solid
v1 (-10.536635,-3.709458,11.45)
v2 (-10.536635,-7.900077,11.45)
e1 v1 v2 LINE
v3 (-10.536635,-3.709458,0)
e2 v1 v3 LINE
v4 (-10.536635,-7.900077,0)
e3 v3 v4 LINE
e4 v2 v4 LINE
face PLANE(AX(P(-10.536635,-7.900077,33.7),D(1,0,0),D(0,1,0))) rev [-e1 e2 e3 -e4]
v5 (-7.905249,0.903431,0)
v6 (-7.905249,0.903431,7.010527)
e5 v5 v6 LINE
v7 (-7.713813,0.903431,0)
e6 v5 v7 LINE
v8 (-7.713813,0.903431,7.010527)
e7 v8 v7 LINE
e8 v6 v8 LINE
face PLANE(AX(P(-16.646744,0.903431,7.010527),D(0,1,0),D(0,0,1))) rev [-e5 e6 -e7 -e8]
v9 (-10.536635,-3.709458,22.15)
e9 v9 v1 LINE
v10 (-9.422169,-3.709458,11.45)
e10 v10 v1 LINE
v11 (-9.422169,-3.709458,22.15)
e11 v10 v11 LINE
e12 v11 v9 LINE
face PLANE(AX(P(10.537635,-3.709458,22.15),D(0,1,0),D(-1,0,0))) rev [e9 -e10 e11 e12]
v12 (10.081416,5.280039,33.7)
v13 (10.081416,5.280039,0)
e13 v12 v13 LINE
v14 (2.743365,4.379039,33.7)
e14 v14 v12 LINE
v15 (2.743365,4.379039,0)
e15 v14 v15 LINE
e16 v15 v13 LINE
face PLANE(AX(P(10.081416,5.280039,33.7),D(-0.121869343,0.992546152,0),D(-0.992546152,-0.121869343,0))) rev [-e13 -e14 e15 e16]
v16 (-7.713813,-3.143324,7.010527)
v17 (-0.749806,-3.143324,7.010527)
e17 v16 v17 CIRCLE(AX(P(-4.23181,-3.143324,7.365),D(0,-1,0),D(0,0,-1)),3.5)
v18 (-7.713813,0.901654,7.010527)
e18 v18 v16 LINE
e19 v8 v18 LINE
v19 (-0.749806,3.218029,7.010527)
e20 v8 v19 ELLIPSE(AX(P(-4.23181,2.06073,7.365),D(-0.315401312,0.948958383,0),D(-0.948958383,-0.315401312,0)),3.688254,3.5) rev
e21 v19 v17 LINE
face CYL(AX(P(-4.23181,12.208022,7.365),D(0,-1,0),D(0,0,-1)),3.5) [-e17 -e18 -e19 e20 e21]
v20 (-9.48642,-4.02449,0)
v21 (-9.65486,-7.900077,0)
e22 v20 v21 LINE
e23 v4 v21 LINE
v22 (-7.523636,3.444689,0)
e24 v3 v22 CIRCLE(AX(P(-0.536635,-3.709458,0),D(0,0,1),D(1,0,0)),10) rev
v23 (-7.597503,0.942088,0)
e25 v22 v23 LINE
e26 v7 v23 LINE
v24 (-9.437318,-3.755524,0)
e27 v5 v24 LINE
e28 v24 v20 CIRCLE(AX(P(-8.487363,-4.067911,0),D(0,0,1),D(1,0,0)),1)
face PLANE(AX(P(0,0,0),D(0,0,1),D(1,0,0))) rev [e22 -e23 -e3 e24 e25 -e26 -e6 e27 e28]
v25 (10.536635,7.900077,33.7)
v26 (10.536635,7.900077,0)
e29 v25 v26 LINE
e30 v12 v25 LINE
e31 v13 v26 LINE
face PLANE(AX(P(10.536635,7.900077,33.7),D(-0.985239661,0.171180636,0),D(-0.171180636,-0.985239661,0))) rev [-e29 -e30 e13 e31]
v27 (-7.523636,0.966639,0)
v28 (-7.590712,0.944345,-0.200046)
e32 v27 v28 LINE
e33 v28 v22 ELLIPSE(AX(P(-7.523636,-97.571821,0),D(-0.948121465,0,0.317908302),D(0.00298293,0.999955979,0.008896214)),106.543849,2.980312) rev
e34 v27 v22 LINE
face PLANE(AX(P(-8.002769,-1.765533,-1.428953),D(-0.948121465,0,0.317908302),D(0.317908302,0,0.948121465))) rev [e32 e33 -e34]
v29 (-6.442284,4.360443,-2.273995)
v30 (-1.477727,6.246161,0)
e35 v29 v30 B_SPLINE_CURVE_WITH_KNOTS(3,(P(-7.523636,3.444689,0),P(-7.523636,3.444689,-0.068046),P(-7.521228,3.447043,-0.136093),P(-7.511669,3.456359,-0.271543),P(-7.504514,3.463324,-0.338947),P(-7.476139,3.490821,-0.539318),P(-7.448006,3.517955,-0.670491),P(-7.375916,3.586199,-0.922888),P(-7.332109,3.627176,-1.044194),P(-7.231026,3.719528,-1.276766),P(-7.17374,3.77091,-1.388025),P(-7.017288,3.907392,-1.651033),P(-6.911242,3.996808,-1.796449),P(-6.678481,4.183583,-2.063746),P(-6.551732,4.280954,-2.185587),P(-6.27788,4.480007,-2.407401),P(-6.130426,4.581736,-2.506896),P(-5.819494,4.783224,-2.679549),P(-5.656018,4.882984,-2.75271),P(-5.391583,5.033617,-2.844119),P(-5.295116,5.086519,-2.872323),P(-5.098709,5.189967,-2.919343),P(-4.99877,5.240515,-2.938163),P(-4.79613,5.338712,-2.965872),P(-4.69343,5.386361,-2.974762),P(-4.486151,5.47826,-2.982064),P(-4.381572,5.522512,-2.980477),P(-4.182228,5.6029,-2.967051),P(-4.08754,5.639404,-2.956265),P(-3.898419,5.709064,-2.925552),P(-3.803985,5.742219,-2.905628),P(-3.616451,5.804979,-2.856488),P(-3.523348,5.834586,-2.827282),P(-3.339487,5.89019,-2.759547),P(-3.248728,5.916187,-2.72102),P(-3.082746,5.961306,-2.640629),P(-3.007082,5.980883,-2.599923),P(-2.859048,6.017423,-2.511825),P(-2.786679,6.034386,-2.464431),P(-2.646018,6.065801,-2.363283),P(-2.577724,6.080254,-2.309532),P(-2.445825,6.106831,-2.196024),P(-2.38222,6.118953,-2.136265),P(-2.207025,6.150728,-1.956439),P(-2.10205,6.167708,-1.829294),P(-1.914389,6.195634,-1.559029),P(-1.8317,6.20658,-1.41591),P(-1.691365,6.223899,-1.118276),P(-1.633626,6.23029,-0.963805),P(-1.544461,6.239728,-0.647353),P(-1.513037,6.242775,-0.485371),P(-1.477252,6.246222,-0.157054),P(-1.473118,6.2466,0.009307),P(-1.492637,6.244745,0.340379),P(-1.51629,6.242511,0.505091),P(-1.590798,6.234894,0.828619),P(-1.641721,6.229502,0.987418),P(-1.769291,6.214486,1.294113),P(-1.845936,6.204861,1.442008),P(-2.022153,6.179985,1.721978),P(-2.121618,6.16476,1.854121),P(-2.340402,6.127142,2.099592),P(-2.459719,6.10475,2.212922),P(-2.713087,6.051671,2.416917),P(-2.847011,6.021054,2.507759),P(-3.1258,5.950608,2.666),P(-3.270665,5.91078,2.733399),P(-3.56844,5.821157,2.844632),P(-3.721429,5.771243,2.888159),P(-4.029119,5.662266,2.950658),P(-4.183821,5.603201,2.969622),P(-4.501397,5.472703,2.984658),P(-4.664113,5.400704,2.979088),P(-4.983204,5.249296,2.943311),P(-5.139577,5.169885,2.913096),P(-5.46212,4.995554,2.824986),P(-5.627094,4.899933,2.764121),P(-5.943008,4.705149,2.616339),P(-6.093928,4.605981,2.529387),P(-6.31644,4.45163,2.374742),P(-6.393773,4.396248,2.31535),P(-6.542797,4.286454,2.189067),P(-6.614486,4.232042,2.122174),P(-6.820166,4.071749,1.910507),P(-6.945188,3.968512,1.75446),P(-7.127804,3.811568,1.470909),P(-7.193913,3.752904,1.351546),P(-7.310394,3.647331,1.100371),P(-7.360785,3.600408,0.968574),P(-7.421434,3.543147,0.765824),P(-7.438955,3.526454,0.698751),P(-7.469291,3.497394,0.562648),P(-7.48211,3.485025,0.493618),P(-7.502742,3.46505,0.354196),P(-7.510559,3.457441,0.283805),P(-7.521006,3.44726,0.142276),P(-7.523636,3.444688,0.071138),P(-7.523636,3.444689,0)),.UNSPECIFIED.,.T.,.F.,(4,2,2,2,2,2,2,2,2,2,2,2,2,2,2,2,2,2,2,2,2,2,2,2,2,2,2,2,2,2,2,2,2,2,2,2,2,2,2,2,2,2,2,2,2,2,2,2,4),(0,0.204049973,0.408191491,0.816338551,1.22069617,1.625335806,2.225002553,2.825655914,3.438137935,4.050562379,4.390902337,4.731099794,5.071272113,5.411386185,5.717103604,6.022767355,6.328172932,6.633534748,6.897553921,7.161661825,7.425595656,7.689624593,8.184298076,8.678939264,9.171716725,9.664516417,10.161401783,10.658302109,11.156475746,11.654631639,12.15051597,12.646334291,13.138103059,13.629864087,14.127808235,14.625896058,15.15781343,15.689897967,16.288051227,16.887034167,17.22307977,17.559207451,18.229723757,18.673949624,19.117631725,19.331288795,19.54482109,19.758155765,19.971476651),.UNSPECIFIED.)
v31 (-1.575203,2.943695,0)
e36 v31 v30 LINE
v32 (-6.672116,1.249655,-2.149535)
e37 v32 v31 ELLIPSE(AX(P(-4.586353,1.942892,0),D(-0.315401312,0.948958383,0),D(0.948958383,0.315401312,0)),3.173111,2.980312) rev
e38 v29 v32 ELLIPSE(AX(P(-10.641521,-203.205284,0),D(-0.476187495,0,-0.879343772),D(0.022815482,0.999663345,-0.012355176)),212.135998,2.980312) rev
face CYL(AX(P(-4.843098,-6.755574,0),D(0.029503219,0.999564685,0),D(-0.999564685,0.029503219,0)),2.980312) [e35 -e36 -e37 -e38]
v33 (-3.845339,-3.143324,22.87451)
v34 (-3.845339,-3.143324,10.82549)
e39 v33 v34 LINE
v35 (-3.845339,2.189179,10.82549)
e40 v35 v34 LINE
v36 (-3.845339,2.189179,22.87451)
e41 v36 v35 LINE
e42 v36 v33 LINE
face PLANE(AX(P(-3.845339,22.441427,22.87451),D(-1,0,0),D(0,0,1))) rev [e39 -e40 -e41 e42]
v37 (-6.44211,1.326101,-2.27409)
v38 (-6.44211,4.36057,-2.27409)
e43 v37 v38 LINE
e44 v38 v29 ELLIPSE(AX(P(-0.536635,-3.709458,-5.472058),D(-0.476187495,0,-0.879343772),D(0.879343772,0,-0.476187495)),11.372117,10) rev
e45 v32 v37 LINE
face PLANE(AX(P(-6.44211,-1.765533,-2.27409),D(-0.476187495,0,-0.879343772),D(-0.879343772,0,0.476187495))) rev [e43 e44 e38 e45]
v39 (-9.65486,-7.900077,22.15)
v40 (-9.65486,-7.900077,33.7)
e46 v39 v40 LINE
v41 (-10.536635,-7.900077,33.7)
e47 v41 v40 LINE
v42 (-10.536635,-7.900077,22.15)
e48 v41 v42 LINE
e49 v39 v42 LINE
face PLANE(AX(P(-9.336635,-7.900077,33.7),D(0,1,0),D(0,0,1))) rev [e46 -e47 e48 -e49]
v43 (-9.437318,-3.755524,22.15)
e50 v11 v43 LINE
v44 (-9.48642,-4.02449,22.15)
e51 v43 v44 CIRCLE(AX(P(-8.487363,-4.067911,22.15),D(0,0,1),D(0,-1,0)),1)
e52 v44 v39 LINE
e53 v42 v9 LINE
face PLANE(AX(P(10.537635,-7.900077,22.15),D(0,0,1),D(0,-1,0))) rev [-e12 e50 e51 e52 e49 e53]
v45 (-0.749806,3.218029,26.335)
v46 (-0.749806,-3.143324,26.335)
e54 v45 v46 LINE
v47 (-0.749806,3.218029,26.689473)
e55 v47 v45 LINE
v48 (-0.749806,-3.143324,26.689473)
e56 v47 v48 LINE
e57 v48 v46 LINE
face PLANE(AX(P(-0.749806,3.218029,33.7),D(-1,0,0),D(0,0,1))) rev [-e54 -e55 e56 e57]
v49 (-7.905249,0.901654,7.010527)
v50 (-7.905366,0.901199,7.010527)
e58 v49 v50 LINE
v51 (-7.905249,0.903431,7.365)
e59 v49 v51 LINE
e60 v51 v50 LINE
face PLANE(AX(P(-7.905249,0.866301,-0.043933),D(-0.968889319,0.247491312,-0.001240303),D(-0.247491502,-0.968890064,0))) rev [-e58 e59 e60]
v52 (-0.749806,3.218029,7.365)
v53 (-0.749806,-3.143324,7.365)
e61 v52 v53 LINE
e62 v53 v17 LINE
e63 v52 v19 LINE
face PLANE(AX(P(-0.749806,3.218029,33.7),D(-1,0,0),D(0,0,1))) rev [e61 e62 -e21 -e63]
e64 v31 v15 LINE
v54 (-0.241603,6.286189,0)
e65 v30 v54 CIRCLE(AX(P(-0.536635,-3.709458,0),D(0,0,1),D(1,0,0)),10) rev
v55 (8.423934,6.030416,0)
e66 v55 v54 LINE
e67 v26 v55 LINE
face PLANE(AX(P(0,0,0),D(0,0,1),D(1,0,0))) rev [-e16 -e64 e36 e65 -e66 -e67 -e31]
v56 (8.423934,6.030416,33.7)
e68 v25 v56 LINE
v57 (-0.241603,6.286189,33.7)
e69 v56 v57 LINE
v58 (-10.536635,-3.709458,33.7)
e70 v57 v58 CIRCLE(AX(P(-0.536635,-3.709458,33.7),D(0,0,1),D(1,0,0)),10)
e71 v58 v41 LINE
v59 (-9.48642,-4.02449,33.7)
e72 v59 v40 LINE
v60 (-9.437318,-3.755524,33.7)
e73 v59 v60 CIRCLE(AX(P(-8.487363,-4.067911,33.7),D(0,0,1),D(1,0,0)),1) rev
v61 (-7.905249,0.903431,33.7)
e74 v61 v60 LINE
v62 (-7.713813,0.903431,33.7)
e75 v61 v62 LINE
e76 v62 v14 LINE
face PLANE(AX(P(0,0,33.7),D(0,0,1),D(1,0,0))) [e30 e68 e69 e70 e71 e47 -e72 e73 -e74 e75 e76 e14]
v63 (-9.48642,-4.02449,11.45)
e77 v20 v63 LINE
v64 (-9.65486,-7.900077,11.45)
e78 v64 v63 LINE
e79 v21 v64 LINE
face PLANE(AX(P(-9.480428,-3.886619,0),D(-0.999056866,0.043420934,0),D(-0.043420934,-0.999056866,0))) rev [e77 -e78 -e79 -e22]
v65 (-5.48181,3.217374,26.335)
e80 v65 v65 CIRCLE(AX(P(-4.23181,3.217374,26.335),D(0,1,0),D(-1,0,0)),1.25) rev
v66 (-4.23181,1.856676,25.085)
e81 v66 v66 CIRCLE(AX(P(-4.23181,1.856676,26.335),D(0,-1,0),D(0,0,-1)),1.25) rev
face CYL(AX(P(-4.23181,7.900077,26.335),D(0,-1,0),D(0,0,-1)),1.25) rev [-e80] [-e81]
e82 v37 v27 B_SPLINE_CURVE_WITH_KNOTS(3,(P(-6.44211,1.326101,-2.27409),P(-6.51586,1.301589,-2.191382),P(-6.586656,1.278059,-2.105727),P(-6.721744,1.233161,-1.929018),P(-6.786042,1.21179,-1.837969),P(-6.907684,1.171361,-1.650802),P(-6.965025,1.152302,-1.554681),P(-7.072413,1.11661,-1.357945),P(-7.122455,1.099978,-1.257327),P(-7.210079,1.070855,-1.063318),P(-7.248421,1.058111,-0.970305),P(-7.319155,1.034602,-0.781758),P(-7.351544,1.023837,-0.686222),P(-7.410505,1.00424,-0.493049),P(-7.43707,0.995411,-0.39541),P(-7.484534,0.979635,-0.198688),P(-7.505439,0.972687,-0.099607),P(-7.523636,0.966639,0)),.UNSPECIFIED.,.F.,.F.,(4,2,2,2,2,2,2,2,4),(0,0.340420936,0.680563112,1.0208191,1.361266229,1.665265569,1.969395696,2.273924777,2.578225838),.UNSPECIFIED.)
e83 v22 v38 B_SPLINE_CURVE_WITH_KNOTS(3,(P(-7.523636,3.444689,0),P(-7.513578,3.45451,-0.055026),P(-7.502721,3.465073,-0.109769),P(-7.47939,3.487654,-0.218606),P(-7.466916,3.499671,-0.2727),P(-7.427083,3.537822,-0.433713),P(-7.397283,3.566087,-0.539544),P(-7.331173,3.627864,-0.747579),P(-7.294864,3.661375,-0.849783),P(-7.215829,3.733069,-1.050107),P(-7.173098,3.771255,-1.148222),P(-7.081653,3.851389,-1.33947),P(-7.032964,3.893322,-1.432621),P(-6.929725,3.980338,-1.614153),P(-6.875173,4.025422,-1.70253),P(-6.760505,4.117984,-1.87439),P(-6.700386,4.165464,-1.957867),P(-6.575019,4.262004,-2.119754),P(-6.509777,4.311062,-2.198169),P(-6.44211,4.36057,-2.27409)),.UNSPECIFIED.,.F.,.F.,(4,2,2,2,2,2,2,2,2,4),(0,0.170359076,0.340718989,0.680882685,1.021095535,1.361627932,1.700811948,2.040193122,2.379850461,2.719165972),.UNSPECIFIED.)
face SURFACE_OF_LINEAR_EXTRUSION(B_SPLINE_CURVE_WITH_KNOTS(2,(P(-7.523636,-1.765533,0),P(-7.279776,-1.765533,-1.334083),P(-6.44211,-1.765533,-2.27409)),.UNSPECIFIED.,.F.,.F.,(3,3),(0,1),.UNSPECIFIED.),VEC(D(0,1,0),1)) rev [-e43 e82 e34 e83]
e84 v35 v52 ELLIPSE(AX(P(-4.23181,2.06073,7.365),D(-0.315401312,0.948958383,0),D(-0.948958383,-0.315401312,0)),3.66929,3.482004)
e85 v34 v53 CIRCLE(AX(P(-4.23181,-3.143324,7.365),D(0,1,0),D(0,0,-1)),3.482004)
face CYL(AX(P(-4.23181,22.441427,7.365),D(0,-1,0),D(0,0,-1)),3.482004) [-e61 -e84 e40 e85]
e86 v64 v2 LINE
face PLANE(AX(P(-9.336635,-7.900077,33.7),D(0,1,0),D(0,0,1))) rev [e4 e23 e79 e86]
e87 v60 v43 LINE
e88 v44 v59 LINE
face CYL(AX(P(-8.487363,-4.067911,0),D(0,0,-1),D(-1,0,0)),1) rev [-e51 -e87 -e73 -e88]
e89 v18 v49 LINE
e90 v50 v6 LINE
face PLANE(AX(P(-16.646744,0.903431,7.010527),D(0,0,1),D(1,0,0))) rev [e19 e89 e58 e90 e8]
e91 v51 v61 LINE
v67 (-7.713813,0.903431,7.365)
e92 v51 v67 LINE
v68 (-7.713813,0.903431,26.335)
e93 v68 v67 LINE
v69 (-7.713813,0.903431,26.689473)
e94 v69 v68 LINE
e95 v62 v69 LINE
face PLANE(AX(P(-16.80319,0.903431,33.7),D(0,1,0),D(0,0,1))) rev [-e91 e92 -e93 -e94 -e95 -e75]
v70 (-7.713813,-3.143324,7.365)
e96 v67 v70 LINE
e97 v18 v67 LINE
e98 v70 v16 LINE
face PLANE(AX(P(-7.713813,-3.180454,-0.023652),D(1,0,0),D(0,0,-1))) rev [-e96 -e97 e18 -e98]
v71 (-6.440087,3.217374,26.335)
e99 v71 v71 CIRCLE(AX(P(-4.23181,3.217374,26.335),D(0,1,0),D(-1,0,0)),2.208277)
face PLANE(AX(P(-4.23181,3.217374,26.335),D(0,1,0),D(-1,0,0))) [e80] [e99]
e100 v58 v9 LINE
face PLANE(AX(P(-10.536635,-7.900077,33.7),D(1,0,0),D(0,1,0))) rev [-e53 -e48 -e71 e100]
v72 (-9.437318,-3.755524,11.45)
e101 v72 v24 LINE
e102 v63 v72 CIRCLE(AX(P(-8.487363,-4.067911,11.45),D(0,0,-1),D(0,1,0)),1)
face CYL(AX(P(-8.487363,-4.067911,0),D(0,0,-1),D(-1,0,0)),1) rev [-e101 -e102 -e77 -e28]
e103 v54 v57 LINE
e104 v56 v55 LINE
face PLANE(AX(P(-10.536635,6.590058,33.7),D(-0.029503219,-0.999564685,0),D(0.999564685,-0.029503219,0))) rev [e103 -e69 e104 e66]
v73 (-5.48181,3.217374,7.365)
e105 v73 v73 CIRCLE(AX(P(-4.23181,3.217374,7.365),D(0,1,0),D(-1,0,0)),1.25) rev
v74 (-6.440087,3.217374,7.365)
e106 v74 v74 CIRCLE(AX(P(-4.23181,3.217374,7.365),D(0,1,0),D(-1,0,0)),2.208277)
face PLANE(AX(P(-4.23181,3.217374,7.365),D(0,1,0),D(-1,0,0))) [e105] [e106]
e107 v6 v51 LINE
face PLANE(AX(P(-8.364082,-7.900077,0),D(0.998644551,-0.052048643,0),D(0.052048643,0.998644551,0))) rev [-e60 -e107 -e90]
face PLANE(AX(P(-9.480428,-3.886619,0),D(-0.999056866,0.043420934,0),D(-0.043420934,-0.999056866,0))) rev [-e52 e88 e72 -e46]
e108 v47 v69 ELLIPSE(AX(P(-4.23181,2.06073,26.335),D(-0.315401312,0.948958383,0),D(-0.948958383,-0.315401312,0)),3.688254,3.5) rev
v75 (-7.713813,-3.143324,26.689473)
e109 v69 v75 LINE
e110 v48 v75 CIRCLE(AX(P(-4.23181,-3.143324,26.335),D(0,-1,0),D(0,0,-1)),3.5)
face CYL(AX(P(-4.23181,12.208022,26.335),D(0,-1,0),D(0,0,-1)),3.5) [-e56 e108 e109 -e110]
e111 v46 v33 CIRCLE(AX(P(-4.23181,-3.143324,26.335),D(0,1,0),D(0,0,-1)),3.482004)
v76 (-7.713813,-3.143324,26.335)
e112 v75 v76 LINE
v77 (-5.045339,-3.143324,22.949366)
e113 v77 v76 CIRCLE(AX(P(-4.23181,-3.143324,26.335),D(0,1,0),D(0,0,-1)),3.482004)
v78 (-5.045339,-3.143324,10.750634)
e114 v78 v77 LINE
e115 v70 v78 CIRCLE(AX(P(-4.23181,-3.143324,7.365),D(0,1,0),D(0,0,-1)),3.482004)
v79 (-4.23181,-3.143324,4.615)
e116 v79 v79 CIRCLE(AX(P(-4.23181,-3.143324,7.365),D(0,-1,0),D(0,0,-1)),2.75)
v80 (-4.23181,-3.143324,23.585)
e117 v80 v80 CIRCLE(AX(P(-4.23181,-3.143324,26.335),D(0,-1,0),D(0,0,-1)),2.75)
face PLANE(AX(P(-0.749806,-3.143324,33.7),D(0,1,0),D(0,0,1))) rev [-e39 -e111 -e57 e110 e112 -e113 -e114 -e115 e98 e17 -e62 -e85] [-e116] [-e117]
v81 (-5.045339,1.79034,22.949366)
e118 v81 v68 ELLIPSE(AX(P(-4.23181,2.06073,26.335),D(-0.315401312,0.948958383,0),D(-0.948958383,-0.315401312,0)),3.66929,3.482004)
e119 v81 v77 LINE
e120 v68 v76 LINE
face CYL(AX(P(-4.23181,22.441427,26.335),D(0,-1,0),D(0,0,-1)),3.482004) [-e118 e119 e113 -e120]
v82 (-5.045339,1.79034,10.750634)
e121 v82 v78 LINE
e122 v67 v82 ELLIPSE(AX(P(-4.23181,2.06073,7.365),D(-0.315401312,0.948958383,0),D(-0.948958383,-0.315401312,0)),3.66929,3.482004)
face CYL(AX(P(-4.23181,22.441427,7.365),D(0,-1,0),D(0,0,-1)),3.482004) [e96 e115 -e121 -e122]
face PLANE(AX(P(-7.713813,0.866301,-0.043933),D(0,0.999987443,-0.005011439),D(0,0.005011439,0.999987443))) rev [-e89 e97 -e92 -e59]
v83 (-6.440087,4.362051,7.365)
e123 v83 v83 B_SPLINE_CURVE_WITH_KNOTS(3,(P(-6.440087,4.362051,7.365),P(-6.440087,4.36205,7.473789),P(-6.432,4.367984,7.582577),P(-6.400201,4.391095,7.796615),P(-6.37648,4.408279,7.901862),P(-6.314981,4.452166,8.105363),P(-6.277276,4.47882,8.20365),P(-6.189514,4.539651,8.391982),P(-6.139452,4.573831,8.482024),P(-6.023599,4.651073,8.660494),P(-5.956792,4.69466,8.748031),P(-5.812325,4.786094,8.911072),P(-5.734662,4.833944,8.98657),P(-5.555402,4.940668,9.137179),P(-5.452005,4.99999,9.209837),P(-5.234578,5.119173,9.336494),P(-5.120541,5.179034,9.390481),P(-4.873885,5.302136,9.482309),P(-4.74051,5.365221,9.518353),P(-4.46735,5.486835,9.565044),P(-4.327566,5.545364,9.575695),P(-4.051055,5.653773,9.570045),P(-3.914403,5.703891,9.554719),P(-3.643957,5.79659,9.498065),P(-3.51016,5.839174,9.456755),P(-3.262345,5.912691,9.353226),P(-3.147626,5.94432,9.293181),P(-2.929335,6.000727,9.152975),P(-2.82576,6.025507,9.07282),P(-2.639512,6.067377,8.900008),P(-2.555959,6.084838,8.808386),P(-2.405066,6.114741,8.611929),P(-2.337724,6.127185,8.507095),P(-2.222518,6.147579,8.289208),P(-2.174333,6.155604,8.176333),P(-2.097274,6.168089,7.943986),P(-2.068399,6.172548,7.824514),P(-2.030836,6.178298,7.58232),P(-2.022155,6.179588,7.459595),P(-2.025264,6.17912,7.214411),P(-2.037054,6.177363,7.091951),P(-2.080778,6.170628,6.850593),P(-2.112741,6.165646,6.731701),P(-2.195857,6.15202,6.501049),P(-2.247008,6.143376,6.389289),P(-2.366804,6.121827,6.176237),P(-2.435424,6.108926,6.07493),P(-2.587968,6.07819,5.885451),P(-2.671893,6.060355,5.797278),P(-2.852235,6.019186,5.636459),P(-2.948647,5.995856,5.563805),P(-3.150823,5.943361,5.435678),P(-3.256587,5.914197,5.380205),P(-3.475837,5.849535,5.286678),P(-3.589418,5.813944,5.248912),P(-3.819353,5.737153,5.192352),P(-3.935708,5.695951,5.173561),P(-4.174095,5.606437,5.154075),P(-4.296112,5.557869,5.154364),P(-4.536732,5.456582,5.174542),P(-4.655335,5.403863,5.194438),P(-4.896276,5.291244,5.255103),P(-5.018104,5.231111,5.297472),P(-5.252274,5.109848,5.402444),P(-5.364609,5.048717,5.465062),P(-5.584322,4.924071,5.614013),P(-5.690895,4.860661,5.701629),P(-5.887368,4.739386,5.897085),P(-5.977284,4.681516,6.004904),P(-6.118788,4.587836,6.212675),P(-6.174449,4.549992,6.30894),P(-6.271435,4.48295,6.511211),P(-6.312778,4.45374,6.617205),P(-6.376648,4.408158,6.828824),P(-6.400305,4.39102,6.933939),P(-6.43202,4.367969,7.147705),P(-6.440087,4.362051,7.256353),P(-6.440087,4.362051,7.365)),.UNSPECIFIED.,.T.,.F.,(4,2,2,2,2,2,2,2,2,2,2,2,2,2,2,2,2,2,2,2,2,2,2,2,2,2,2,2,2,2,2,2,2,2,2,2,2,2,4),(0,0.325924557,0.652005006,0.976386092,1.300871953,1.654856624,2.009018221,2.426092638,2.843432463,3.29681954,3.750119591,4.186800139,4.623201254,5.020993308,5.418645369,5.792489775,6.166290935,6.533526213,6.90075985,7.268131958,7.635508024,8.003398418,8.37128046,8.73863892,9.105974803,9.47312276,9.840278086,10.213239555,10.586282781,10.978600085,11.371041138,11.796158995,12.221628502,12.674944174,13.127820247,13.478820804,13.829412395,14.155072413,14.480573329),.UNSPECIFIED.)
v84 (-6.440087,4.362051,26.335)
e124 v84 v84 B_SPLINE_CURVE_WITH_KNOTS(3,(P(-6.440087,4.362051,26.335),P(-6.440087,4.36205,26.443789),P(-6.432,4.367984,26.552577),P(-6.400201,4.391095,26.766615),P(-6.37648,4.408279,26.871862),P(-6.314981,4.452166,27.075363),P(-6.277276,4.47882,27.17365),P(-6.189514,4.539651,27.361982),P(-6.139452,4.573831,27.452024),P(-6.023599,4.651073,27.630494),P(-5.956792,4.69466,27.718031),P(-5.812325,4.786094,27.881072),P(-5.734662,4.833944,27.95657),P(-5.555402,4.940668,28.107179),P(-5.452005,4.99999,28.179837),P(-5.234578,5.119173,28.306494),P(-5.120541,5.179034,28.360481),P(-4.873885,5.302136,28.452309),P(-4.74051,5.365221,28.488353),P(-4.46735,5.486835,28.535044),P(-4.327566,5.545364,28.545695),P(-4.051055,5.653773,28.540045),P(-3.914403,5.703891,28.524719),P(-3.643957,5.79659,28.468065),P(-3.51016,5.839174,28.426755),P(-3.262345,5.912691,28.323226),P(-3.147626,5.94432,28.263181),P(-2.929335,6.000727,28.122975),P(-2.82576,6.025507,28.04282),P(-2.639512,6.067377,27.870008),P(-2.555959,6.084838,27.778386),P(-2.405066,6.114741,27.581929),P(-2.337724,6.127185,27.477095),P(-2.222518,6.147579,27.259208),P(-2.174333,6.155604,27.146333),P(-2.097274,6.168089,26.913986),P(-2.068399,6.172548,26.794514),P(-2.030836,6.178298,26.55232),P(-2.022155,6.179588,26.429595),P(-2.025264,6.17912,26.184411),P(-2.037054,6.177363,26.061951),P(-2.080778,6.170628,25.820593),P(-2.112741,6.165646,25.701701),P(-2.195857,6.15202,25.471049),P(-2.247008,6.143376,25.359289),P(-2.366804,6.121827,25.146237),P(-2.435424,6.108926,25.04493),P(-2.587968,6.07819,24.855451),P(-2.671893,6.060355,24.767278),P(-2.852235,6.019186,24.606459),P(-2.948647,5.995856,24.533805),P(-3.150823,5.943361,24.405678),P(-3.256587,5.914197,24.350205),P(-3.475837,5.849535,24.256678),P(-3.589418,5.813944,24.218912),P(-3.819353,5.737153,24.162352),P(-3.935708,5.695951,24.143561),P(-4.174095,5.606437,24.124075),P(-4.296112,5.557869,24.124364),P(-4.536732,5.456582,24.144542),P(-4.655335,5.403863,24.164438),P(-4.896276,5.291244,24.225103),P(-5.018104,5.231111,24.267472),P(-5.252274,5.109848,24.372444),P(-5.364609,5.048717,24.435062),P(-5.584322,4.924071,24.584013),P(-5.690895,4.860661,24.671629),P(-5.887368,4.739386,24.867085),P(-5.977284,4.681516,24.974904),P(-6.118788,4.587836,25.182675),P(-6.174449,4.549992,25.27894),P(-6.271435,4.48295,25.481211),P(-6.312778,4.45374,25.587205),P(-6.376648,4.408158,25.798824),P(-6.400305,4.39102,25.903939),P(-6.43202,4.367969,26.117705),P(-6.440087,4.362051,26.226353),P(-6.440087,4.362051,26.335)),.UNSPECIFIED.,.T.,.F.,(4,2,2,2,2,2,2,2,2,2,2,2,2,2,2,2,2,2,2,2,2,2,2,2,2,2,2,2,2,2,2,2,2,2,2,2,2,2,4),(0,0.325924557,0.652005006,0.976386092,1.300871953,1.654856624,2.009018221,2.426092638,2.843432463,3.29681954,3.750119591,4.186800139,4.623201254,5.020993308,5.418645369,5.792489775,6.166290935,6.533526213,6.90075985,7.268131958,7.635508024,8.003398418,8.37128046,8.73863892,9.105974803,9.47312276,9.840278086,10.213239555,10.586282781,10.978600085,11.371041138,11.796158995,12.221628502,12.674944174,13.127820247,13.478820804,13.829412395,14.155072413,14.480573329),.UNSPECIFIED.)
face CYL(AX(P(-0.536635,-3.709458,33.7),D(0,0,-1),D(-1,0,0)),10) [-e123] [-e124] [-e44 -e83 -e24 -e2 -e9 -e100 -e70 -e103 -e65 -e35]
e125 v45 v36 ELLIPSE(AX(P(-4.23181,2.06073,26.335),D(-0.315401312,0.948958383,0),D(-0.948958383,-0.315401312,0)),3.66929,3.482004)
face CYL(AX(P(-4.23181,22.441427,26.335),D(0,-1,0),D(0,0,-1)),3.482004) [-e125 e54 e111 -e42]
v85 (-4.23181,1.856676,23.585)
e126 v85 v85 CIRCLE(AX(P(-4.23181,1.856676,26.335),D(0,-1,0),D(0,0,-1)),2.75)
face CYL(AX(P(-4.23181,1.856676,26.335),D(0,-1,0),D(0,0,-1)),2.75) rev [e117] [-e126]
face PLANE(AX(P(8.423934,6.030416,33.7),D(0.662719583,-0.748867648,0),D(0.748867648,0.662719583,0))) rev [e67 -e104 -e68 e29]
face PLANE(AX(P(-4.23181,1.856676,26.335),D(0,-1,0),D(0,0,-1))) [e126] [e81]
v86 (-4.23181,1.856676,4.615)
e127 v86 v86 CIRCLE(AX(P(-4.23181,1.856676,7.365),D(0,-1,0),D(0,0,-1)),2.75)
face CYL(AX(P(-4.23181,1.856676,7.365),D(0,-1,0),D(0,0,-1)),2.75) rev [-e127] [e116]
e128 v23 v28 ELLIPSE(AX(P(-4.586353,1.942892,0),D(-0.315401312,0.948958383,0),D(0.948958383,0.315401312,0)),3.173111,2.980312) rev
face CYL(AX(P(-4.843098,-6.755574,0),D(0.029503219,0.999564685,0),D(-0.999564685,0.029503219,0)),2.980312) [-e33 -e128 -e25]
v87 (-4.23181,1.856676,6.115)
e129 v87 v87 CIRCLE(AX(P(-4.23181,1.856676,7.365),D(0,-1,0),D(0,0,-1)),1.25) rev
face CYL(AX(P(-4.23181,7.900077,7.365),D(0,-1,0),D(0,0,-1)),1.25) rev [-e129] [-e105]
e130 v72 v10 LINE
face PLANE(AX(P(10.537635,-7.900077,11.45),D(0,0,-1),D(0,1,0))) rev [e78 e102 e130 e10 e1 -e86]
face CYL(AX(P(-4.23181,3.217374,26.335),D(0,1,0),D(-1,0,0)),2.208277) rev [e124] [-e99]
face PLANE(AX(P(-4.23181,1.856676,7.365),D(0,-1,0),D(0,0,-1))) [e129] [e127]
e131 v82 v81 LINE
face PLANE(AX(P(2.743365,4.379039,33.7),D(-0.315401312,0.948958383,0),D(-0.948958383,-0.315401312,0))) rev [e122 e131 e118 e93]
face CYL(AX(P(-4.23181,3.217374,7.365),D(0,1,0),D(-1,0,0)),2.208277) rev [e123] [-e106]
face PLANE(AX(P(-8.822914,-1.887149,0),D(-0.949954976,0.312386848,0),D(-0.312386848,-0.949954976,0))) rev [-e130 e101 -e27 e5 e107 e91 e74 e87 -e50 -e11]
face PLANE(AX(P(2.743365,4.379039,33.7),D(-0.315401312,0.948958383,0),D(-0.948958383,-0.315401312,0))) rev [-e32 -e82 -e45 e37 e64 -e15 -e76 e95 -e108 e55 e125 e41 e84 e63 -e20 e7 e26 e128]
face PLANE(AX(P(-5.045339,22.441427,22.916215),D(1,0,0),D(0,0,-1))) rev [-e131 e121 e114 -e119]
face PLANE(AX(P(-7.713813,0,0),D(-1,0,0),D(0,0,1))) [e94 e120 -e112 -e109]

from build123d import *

# Parameters (mm, degrees)
BOSS_EXTRUDE1_DEPTH      = 33.7
FILLET1_R                = 20
FILLET2_R                = 10
CUT_EXTRUDE1_REACH       = 42.524
CUT_EXTRUDE1_END_RADIUS  = 20
SKETCH18_W               = 10.7
SKETCH18_H               = 4.190618397
CUT_EXTRUDE2_REACH       = 38.996
CUT_EXTRUDE3_REACH       = 38.996
CUT_EXTRUDE4_REACH       = 41.13
CUT_EXTRUDE5_REACH       = 41.13
CUT_EXTRUDE6_REACH       = 41.13
SKETCH37_W               = 7.010527041
SKETCH37_H               = 4.046754886
CUT_EXTRUDE7_DEPTH       = 30.450302171
CUT_EXTRUDE8_DEPTH       = 10
SKETCH40_R               = 1.25
CUT_EXTRUDE9_DEPTH       = 37.995504756
SKETCH41_R               = 2.75
CUT_EXTRUDE10_DEPTH      = 5
SKETCH42_R               = 2.208277428
CUT_EXTRUDE11_DEPTH      = 3
CUT_EXTRUDE12_DEPTH      = 37.18178953
FILLET3_R                = 1
BOSS_EXTRUDE2_REACH      = 40.099
SKETCH44_R               = 2.980312175
CUT_EXTRUDE13_REACH      = 40.099
CUT_EXTRUDE13_END_RADIUS = 10
SKETCH46_R               = 2.980312175
CUT_EXTRUDE14_REACH      = 40.026


with BuildPart() as part:
    # Sketch17 → Boss-Extrude1 (new body)
    with BuildSketch(Plane.XY):
        Polygon((10.53663492, 7.900076539), (10.081415975, 5.280038612), (2.74336508, 4.379039255), (-0.749806064, 3.218028635), (-0.749806064, -3.143324057), (-7.713813222, -3.143324057), (-8.111536279, 0.095870306), (-9.33663492, -4.700076539), (-9.33663492, -7.900076539), (-10.53663492, -7.900076539), (-10.53663492, -3.500076539), (-10.53663492, 6.590057575), (8.423934133, 6.030416141), align=None)
    extrude(amount=BOSS_EXTRUDE1_DEPTH)

    # Fillet1
    fillet1_edges = [part.edges().sort_by_distance(p)[0] for p in [
        (-9.33663492, -4.700076539, 16.85),
    ]]
    fillet(fillet1_edges, radius=FILLET1_R)

    # Fillet2
    fillet2_edges = [part.edges().sort_by_distance(p)[0] for p in [
        (-10.53663492, 6.590057575, 16.85),
    ]]
    fillet(fillet2_edges, radius=FILLET2_R)

    # Cut-Extrude1: up to this cylinder (the profile starts outside it)
    cut_extrude1_end = Plane(origin=(10.66336508, -7.214158247, 16.8), z_dir=(0, 0, 1)) * Cylinder(CUT_EXTRUDE1_END_RADIUS, 126.048, mode=Mode.PRIVATE)
    # Sketch18 → Cut-Extrude1 (cut, up to the surface)
    with BuildSketch(Plane.ZY.offset(10.53663492), mode=Mode.PRIVATE) as cut_extrude1_sk1:
        with Locations((16.8, -5.804767341)):
            Rectangle(SKETCH18_W, SKETCH18_H)
    cut_extrude1_tool1 = extrude(cut_extrude1_sk1.sketch, amount=-CUT_EXTRUDE1_REACH, mode=Mode.PRIVATE) - cut_extrude1_end
    add(cut_extrude1_tool1.solids().sort_by_distance((-10.536635, -5.804767, 16.8))[0], mode=Mode.SUBTRACT)

    # Cut-Extrude2: up to this plane
    cut_extrude2_end = Plane(origin=(2.74336508, 4.379039255, 33.7), z_dir=(-0.3154013115740007, 0.9489583829954822, 0))
    # Sketch32 → Cut-Extrude2 (cut, up to the surface)
    with BuildSketch(Plane.XZ.offset(3.143324057), mode=Mode.PRIVATE) as cut_extrude2_sk1:
        with BuildLine():
            Line((-0.749806064, 33.7), (-7.713813222, 33.7))
            Line((-7.713813222, 33.7), (-7.713813222, 26.689472959))
            ThreePointArc((-7.713813222, 26.689472959), (-4.231809642, 29.835), (-0.749806064, 26.689472956))
            Line((-0.749806064, 26.689472956), (-0.749806064, 33.7))
        make_face()
    cut_extrude2_tool1 = split(extrude(cut_extrude2_sk1.sketch, amount=-CUT_EXTRUDE2_REACH, mode=Mode.PRIVATE), bisect_by=cut_extrude2_end, keep=Keep.BOTH, mode=Mode.PRIVATE)
    add(cut_extrude2_tool1.solids().sort_by_distance((-4.23181, -3.143324, 31.335376))[0], mode=Mode.SUBTRACT)
    # Sketch32 → Cut-Extrude2 (cut, up to the surface)
    with BuildSketch(Plane.XZ.offset(3.143324057), mode=Mode.PRIVATE) as cut_extrude2_sk2:
        with BuildLine():
            ThreePointArc((-0.749806064, 7.010527044), (-4.231809642, 3.865), (-7.713813222, 7.010527041))
            Line((-7.713813222, 7.010527041), (-7.713813222, 0))
            Line((-7.713813222, 0), (-0.749806064, 0))
            Line((-0.749806064, 0), (-0.749806064, 7.010527044))
        make_face()
    cut_extrude2_tool2 = split(extrude(cut_extrude2_sk2.sketch, amount=-CUT_EXTRUDE2_REACH, mode=Mode.PRIVATE), bisect_by=cut_extrude2_end, keep=Keep.BOTH, mode=Mode.PRIVATE)
    add(cut_extrude2_tool2.solids().sort_by_distance((-4.23181, -3.143324, 2.364624))[0], mode=Mode.SUBTRACT)

    # Cut-Extrude3: up to this plane
    cut_extrude3_end = Plane(origin=(2.74336508, 4.379039255, 33.7), z_dir=(-0.3154013115740007, 0.9489583829954822, 0))
    # Sketch33 → Cut-Extrude3 (cut, up to the surface)
    with BuildSketch(Plane.XZ.offset(3.143324057), mode=Mode.PRIVATE) as cut_extrude3_sk1:
        with BuildLine():
            Line((-0.749806064, 26.335), (-0.749806064, 7.365))
            ThreePointArc((-0.749806064, 7.365), (-1.636617826, 9.6864927), (-3.845338986, 10.825489756))
            Line((-3.845338986, 10.825489756), (-3.845338986, 22.874510244))
            ThreePointArc((-3.845338986, 22.874510244), (-1.636617826, 24.0135073), (-0.749806064, 26.335))
        make_face()
    cut_extrude3_tool1 = split(extrude(cut_extrude3_sk1.sketch, amount=-CUT_EXTRUDE3_REACH, mode=Mode.PRIVATE), bisect_by=cut_extrude3_end, keep=Keep.BOTH, mode=Mode.PRIVATE)
    add(cut_extrude3_tool1.solids().sort_by_distance((-2.202773, -3.143324, 16.85))[0], mode=Mode.SUBTRACT)
    # Sketch33 → Cut-Extrude3 (cut, up to the surface)
    with BuildSketch(Plane.XZ.offset(3.143324057), mode=Mode.PRIVATE) as cut_extrude3_sk2:
        with BuildLine():
            Line((-7.713813222, 26.335), (-7.713813222, 7.365))
            ThreePointArc((-7.713813222, 7.365), (-6.966499846, 9.520416066), (-5.045338986, 10.750634199))
            Line((-5.045338986, 10.750634199), (-5.045338986, 22.916214753))
            Line((-5.045338986, 22.916214753), (-5.045338986, 22.949365801))
            ThreePointArc((-5.045338986, 22.949365801), (-6.966499846, 24.179583934), (-7.713813222, 26.335))
        make_face()
    cut_extrude3_tool2 = split(extrude(cut_extrude3_sk2.sketch, amount=-CUT_EXTRUDE3_REACH, mode=Mode.PRIVATE), bisect_by=cut_extrude3_end, keep=Keep.BOTH, mode=Mode.PRIVATE)
    add(cut_extrude3_tool2.solids().sort_by_distance((-6.459589, -3.143324, 16.85))[0], mode=Mode.SUBTRACT)

    # Cut-Extrude4: up to this plane
    cut_extrude4_end = Plane(origin=(-8.111536279, 0.095870306, 33.7), z_dir=(-0.9688885735577917, 0.2474973374182996, 0))
    # Sketch35 → Cut-Extrude4 (cut, up to the surface)
    with BuildSketch(Plane(origin=(-7.713813222, 0, 0), x_dir=(0, 0, -1), z_dir=(1, 0, 0)), mode=Mode.PRIVATE) as cut_extrude4_sk1:
        Polygon((-33.7, 0.903430829), (-26.689472959, 0.903430829), (-26.51223648, -3.143324057), (-33.7, -3.143324057), align=None)
    cut_extrude4_tool1 = split(extrude(cut_extrude4_sk1.sketch, amount=-CUT_EXTRUDE4_REACH, mode=Mode.PRIVATE), bisect_by=cut_extrude4_end, keep=Keep.BOTH, mode=Mode.PRIVATE)
    add(cut_extrude4_tool1.solids().sort_by_distance((-7.713813, -1.128366, 30.150243))[0], mode=Mode.SUBTRACT)

    # Cut-Extrude5: up to this plane
    cut_extrude5_end = Plane(origin=(-8.111536279, 0.095870306, 33.7), z_dir=(-0.9688885735577917, 0.2474973374182996, 0))
    # Sketch36 → Cut-Extrude5 (cut, up to the surface)
    with BuildSketch(Plane(origin=(-7.713813222, 0, 0), x_dir=(0, 0, -1), z_dir=(1, 0, 0)), mode=Mode.PRIVATE) as cut_extrude5_sk1:
        Polygon((-7.385460395, -3.179256499), (-26.335, -3.143324057), (-26.335, 0.903430829), (-7.365, 0.903430829), align=None)
    cut_extrude5_tool1 = split(extrude(cut_extrude5_sk1.sketch, amount=-CUT_EXTRUDE5_REACH, mode=Mode.PRIVATE), bisect_by=cut_extrude5_end, keep=Keep.BOTH, mode=Mode.PRIVATE)
    add(cut_extrude5_tool1.solids().sort_by_distance((-7.713813, -1.128579, 16.84114))[0], mode=Mode.SUBTRACT)

    # Cut-Extrude6: up to this plane
    cut_extrude6_end = Plane(origin=(-8.111536279, 0.095870306, 33.7), z_dir=(-0.9688885735577917, 0.2474973374182996, 0))
    # Sketch37 → Cut-Extrude6 (cut, up to the surface)
    with BuildSketch(Plane(origin=(-7.713813222, 0, 0), x_dir=(0, 0, -1), z_dir=(1, 0, 0)), mode=Mode.PRIVATE) as cut_extrude6_sk1:
        with Locations((-3.505263521, -1.119946614)):
            Rectangle(SKETCH37_W, SKETCH37_H)
    cut_extrude6_tool1 = split(extrude(cut_extrude6_sk1.sketch, amount=-CUT_EXTRUDE6_REACH, mode=Mode.PRIVATE), bisect_by=cut_extrude6_end, keep=Keep.BOTH, mode=Mode.PRIVATE)
    add(cut_extrude6_tool1.solids().sort_by_distance((-7.713813, -1.119947, 3.505264))[0], mode=Mode.SUBTRACT)

    # Sketch38 → Cut-Extrude7 (cut, through all)
    with BuildSketch(Plane(origin=(0, 0.036931473, 7.369342463), x_dir=(1, 0, 0), z_dir=(0, 0.005011438902896351, 0.999987442661218))):
        Polygon((-7.713813222, 0.866510236), (-7.905249318, 0.866510236), (-8.111536279, 0.058939572), (-7.713813222, -3.180295466), align=None)
    extrude(amount=-CUT_EXTRUDE7_DEPTH, mode=Mode.SUBTRACT)

    # Sketch39 → Cut-Extrude8 (cut)
    with BuildSketch(Plane(origin=(0, 0, 26.335), x_dir=(-1, 0, 0), z_dir=(0, 0, -1))):
        Polygon((7.905249318, 0.903430829), (7.713813222, 0.903430829), (7.713813222, -3.143324057), (8.111536279, 0.095870306), align=None)
    extrude(amount=-CUT_EXTRUDE8_DEPTH, mode=Mode.SUBTRACT)

    # Sketch40 → Cut-Extrude9 (cut, through all)
    with BuildSketch(Plane.XZ.offset(3.143324057)):
        with Locations((-4.231809643, 7.365)):
            Circle(SKETCH40_R)
        with Locations((-4.231809643, 26.335)):
            Circle(SKETCH40_R)
    extrude(amount=-CUT_EXTRUDE9_DEPTH, mode=Mode.SUBTRACT)

    # Sketch41 → Cut-Extrude10 (cut)
    with BuildSketch(Plane.XZ.offset(3.143324057)):
        with Locations((-4.231809643, 26.335)):
            Circle(SKETCH41_R)
        with Locations((-4.231809643, 7.365)):
            Circle(SKETCH41_R)
    extrude(amount=-CUT_EXTRUDE10_DEPTH, mode=Mode.SUBTRACT)

    # Sketch42 → Cut-Extrude11 (cut)
    with BuildSketch(Plane.ZX.offset(6.217374095)):
        with Locations((7.365, -4.231809643)):
            Circle(SKETCH42_R)
        with Locations((26.335, -4.231809643)):
            Circle(SKETCH42_R)
    extrude(amount=-CUT_EXTRUDE11_DEPTH, mode=Mode.SUBTRACT)

    # Sketch43 → Cut-Extrude12 (cut, through all)
    with BuildSketch(Plane.XY.offset(33.7)):
        Polygon((-7.905249318, 0.903430829), (-8.822914385, -1.887149193), (-9.480427728, -3.886619005), (-9.654860317, -7.900076539), (-8.364081852, -7.900076539), align=None)
    extrude(amount=-CUT_EXTRUDE12_DEPTH, mode=Mode.SUBTRACT)

    # Fillet3
    fillet3_edges = [part.edges().sort_by_distance(p)[0] for p in [
        (-9.480427728, -3.886619005, 5.725),
        (-9.480427728, -3.886619005, 27.925),
    ]]
    fillet(fillet3_edges, radius=FILLET3_R)

    # Boss-Extrude2: up to this plane
    boss_extrude2_end = Plane(origin=(2.74336508, 4.379039255, 33.7), z_dir=(-0.3154013115740007, 0.9489583829954822, 0))
    # Sketch44 → Boss-Extrude2 (add, up to the surface)
    with BuildSketch(Plane(origin=(0.185171765, 6.273592006, 0), x_dir=(0.999564685295442, -0.029503218641770287, 0), z_dir=(0.029503218641770287, 0.999564685295442, 0)), mode=Mode.PRIVATE) as boss_extrude2_sk1:
        with Locations((-4.641678191, 0)):
            Circle(SKETCH44_R)
    boss_extrude2_tool1 = split(extrude(boss_extrude2_sk1.sketch, amount=-BOSS_EXTRUDE2_REACH, mode=Mode.PRIVATE), bisect_by=boss_extrude2_end, keep=Keep.BOTH, mode=Mode.PRIVATE)
    add(boss_extrude2_tool1.solids().sort_by_distance((-4.454486, 6.410536, 0))[0])

    # Cut-Extrude13: up to this cylinder (the profile starts outside it)
    cut_extrude13_end = Plane(origin=(-0.53663492, -3.709458142, 0), z_dir=(0, 0, -1)) * Cylinder(CUT_EXTRUDE13_END_RADIUS, 101.198, mode=Mode.PRIVATE)
    # Sketch46 → Cut-Extrude13 (cut, up to the surface)
    with BuildSketch(Plane(origin=(0.185171765, 6.273592006, 0), x_dir=(0.999564685295442, -0.029503218641770287, 0), z_dir=(0.029503218641770287, 0.999564685295442, 0)), mode=Mode.PRIVATE) as cut_extrude13_sk1:
        with Locations((-4.641678191, 0)):
            Circle(SKETCH46_R)
    cut_extrude13_tool1 = extrude(cut_extrude13_sk1.sketch, amount=-CUT_EXTRUDE13_REACH, mode=Mode.PRIVATE) - cut_extrude13_end
    add(cut_extrude13_tool1.solids().sort_by_distance((-4.454486, 6.410536, 0))[0], mode=Mode.SUBTRACT)

    # Cut-Extrude14: up to this plane
    cut_extrude14_end = Plane(origin=(2.74336508, 4.379039255, 33.7), z_dir=(-0.3154013115740007, 0.9489583829954822, 0))
    # Sketch47 → Cut-Extrude14 (cut, up to the surface)
    with BuildSketch(Plane.ZX.offset(6.217374095), mode=Mode.PRIVATE) as cut_extrude14_sk1:
        with BuildLine():
            Line((-2.274089727, -6.442110298), (-1.428952647, -8.002768724))
            Line((-1.428952647, -8.002768724), (0, -7.523636117))
            add(Edge.make_bspline(
                [(0, -7.523636117), (-1.334083286, -7.279775766), (-2.274089727, -6.442110298)],
                knots=[0, 0, 0, 1, 1, 1], degree=2))
        make_face()
    cut_extrude14_tool1 = split(extrude(cut_extrude14_sk1.sketch, amount=-CUT_EXTRUDE14_REACH, mode=Mode.PRIVATE), bisect_by=cut_extrude14_end, keep=Keep.BOTH, mode=Mode.PRIVATE)
    add(cut_extrude14_tool1.solids().sort_by_distance((-7.404175, 6.217374, -1.25113))[0], mode=Mode.SUBTRACT)


solid = part.part
